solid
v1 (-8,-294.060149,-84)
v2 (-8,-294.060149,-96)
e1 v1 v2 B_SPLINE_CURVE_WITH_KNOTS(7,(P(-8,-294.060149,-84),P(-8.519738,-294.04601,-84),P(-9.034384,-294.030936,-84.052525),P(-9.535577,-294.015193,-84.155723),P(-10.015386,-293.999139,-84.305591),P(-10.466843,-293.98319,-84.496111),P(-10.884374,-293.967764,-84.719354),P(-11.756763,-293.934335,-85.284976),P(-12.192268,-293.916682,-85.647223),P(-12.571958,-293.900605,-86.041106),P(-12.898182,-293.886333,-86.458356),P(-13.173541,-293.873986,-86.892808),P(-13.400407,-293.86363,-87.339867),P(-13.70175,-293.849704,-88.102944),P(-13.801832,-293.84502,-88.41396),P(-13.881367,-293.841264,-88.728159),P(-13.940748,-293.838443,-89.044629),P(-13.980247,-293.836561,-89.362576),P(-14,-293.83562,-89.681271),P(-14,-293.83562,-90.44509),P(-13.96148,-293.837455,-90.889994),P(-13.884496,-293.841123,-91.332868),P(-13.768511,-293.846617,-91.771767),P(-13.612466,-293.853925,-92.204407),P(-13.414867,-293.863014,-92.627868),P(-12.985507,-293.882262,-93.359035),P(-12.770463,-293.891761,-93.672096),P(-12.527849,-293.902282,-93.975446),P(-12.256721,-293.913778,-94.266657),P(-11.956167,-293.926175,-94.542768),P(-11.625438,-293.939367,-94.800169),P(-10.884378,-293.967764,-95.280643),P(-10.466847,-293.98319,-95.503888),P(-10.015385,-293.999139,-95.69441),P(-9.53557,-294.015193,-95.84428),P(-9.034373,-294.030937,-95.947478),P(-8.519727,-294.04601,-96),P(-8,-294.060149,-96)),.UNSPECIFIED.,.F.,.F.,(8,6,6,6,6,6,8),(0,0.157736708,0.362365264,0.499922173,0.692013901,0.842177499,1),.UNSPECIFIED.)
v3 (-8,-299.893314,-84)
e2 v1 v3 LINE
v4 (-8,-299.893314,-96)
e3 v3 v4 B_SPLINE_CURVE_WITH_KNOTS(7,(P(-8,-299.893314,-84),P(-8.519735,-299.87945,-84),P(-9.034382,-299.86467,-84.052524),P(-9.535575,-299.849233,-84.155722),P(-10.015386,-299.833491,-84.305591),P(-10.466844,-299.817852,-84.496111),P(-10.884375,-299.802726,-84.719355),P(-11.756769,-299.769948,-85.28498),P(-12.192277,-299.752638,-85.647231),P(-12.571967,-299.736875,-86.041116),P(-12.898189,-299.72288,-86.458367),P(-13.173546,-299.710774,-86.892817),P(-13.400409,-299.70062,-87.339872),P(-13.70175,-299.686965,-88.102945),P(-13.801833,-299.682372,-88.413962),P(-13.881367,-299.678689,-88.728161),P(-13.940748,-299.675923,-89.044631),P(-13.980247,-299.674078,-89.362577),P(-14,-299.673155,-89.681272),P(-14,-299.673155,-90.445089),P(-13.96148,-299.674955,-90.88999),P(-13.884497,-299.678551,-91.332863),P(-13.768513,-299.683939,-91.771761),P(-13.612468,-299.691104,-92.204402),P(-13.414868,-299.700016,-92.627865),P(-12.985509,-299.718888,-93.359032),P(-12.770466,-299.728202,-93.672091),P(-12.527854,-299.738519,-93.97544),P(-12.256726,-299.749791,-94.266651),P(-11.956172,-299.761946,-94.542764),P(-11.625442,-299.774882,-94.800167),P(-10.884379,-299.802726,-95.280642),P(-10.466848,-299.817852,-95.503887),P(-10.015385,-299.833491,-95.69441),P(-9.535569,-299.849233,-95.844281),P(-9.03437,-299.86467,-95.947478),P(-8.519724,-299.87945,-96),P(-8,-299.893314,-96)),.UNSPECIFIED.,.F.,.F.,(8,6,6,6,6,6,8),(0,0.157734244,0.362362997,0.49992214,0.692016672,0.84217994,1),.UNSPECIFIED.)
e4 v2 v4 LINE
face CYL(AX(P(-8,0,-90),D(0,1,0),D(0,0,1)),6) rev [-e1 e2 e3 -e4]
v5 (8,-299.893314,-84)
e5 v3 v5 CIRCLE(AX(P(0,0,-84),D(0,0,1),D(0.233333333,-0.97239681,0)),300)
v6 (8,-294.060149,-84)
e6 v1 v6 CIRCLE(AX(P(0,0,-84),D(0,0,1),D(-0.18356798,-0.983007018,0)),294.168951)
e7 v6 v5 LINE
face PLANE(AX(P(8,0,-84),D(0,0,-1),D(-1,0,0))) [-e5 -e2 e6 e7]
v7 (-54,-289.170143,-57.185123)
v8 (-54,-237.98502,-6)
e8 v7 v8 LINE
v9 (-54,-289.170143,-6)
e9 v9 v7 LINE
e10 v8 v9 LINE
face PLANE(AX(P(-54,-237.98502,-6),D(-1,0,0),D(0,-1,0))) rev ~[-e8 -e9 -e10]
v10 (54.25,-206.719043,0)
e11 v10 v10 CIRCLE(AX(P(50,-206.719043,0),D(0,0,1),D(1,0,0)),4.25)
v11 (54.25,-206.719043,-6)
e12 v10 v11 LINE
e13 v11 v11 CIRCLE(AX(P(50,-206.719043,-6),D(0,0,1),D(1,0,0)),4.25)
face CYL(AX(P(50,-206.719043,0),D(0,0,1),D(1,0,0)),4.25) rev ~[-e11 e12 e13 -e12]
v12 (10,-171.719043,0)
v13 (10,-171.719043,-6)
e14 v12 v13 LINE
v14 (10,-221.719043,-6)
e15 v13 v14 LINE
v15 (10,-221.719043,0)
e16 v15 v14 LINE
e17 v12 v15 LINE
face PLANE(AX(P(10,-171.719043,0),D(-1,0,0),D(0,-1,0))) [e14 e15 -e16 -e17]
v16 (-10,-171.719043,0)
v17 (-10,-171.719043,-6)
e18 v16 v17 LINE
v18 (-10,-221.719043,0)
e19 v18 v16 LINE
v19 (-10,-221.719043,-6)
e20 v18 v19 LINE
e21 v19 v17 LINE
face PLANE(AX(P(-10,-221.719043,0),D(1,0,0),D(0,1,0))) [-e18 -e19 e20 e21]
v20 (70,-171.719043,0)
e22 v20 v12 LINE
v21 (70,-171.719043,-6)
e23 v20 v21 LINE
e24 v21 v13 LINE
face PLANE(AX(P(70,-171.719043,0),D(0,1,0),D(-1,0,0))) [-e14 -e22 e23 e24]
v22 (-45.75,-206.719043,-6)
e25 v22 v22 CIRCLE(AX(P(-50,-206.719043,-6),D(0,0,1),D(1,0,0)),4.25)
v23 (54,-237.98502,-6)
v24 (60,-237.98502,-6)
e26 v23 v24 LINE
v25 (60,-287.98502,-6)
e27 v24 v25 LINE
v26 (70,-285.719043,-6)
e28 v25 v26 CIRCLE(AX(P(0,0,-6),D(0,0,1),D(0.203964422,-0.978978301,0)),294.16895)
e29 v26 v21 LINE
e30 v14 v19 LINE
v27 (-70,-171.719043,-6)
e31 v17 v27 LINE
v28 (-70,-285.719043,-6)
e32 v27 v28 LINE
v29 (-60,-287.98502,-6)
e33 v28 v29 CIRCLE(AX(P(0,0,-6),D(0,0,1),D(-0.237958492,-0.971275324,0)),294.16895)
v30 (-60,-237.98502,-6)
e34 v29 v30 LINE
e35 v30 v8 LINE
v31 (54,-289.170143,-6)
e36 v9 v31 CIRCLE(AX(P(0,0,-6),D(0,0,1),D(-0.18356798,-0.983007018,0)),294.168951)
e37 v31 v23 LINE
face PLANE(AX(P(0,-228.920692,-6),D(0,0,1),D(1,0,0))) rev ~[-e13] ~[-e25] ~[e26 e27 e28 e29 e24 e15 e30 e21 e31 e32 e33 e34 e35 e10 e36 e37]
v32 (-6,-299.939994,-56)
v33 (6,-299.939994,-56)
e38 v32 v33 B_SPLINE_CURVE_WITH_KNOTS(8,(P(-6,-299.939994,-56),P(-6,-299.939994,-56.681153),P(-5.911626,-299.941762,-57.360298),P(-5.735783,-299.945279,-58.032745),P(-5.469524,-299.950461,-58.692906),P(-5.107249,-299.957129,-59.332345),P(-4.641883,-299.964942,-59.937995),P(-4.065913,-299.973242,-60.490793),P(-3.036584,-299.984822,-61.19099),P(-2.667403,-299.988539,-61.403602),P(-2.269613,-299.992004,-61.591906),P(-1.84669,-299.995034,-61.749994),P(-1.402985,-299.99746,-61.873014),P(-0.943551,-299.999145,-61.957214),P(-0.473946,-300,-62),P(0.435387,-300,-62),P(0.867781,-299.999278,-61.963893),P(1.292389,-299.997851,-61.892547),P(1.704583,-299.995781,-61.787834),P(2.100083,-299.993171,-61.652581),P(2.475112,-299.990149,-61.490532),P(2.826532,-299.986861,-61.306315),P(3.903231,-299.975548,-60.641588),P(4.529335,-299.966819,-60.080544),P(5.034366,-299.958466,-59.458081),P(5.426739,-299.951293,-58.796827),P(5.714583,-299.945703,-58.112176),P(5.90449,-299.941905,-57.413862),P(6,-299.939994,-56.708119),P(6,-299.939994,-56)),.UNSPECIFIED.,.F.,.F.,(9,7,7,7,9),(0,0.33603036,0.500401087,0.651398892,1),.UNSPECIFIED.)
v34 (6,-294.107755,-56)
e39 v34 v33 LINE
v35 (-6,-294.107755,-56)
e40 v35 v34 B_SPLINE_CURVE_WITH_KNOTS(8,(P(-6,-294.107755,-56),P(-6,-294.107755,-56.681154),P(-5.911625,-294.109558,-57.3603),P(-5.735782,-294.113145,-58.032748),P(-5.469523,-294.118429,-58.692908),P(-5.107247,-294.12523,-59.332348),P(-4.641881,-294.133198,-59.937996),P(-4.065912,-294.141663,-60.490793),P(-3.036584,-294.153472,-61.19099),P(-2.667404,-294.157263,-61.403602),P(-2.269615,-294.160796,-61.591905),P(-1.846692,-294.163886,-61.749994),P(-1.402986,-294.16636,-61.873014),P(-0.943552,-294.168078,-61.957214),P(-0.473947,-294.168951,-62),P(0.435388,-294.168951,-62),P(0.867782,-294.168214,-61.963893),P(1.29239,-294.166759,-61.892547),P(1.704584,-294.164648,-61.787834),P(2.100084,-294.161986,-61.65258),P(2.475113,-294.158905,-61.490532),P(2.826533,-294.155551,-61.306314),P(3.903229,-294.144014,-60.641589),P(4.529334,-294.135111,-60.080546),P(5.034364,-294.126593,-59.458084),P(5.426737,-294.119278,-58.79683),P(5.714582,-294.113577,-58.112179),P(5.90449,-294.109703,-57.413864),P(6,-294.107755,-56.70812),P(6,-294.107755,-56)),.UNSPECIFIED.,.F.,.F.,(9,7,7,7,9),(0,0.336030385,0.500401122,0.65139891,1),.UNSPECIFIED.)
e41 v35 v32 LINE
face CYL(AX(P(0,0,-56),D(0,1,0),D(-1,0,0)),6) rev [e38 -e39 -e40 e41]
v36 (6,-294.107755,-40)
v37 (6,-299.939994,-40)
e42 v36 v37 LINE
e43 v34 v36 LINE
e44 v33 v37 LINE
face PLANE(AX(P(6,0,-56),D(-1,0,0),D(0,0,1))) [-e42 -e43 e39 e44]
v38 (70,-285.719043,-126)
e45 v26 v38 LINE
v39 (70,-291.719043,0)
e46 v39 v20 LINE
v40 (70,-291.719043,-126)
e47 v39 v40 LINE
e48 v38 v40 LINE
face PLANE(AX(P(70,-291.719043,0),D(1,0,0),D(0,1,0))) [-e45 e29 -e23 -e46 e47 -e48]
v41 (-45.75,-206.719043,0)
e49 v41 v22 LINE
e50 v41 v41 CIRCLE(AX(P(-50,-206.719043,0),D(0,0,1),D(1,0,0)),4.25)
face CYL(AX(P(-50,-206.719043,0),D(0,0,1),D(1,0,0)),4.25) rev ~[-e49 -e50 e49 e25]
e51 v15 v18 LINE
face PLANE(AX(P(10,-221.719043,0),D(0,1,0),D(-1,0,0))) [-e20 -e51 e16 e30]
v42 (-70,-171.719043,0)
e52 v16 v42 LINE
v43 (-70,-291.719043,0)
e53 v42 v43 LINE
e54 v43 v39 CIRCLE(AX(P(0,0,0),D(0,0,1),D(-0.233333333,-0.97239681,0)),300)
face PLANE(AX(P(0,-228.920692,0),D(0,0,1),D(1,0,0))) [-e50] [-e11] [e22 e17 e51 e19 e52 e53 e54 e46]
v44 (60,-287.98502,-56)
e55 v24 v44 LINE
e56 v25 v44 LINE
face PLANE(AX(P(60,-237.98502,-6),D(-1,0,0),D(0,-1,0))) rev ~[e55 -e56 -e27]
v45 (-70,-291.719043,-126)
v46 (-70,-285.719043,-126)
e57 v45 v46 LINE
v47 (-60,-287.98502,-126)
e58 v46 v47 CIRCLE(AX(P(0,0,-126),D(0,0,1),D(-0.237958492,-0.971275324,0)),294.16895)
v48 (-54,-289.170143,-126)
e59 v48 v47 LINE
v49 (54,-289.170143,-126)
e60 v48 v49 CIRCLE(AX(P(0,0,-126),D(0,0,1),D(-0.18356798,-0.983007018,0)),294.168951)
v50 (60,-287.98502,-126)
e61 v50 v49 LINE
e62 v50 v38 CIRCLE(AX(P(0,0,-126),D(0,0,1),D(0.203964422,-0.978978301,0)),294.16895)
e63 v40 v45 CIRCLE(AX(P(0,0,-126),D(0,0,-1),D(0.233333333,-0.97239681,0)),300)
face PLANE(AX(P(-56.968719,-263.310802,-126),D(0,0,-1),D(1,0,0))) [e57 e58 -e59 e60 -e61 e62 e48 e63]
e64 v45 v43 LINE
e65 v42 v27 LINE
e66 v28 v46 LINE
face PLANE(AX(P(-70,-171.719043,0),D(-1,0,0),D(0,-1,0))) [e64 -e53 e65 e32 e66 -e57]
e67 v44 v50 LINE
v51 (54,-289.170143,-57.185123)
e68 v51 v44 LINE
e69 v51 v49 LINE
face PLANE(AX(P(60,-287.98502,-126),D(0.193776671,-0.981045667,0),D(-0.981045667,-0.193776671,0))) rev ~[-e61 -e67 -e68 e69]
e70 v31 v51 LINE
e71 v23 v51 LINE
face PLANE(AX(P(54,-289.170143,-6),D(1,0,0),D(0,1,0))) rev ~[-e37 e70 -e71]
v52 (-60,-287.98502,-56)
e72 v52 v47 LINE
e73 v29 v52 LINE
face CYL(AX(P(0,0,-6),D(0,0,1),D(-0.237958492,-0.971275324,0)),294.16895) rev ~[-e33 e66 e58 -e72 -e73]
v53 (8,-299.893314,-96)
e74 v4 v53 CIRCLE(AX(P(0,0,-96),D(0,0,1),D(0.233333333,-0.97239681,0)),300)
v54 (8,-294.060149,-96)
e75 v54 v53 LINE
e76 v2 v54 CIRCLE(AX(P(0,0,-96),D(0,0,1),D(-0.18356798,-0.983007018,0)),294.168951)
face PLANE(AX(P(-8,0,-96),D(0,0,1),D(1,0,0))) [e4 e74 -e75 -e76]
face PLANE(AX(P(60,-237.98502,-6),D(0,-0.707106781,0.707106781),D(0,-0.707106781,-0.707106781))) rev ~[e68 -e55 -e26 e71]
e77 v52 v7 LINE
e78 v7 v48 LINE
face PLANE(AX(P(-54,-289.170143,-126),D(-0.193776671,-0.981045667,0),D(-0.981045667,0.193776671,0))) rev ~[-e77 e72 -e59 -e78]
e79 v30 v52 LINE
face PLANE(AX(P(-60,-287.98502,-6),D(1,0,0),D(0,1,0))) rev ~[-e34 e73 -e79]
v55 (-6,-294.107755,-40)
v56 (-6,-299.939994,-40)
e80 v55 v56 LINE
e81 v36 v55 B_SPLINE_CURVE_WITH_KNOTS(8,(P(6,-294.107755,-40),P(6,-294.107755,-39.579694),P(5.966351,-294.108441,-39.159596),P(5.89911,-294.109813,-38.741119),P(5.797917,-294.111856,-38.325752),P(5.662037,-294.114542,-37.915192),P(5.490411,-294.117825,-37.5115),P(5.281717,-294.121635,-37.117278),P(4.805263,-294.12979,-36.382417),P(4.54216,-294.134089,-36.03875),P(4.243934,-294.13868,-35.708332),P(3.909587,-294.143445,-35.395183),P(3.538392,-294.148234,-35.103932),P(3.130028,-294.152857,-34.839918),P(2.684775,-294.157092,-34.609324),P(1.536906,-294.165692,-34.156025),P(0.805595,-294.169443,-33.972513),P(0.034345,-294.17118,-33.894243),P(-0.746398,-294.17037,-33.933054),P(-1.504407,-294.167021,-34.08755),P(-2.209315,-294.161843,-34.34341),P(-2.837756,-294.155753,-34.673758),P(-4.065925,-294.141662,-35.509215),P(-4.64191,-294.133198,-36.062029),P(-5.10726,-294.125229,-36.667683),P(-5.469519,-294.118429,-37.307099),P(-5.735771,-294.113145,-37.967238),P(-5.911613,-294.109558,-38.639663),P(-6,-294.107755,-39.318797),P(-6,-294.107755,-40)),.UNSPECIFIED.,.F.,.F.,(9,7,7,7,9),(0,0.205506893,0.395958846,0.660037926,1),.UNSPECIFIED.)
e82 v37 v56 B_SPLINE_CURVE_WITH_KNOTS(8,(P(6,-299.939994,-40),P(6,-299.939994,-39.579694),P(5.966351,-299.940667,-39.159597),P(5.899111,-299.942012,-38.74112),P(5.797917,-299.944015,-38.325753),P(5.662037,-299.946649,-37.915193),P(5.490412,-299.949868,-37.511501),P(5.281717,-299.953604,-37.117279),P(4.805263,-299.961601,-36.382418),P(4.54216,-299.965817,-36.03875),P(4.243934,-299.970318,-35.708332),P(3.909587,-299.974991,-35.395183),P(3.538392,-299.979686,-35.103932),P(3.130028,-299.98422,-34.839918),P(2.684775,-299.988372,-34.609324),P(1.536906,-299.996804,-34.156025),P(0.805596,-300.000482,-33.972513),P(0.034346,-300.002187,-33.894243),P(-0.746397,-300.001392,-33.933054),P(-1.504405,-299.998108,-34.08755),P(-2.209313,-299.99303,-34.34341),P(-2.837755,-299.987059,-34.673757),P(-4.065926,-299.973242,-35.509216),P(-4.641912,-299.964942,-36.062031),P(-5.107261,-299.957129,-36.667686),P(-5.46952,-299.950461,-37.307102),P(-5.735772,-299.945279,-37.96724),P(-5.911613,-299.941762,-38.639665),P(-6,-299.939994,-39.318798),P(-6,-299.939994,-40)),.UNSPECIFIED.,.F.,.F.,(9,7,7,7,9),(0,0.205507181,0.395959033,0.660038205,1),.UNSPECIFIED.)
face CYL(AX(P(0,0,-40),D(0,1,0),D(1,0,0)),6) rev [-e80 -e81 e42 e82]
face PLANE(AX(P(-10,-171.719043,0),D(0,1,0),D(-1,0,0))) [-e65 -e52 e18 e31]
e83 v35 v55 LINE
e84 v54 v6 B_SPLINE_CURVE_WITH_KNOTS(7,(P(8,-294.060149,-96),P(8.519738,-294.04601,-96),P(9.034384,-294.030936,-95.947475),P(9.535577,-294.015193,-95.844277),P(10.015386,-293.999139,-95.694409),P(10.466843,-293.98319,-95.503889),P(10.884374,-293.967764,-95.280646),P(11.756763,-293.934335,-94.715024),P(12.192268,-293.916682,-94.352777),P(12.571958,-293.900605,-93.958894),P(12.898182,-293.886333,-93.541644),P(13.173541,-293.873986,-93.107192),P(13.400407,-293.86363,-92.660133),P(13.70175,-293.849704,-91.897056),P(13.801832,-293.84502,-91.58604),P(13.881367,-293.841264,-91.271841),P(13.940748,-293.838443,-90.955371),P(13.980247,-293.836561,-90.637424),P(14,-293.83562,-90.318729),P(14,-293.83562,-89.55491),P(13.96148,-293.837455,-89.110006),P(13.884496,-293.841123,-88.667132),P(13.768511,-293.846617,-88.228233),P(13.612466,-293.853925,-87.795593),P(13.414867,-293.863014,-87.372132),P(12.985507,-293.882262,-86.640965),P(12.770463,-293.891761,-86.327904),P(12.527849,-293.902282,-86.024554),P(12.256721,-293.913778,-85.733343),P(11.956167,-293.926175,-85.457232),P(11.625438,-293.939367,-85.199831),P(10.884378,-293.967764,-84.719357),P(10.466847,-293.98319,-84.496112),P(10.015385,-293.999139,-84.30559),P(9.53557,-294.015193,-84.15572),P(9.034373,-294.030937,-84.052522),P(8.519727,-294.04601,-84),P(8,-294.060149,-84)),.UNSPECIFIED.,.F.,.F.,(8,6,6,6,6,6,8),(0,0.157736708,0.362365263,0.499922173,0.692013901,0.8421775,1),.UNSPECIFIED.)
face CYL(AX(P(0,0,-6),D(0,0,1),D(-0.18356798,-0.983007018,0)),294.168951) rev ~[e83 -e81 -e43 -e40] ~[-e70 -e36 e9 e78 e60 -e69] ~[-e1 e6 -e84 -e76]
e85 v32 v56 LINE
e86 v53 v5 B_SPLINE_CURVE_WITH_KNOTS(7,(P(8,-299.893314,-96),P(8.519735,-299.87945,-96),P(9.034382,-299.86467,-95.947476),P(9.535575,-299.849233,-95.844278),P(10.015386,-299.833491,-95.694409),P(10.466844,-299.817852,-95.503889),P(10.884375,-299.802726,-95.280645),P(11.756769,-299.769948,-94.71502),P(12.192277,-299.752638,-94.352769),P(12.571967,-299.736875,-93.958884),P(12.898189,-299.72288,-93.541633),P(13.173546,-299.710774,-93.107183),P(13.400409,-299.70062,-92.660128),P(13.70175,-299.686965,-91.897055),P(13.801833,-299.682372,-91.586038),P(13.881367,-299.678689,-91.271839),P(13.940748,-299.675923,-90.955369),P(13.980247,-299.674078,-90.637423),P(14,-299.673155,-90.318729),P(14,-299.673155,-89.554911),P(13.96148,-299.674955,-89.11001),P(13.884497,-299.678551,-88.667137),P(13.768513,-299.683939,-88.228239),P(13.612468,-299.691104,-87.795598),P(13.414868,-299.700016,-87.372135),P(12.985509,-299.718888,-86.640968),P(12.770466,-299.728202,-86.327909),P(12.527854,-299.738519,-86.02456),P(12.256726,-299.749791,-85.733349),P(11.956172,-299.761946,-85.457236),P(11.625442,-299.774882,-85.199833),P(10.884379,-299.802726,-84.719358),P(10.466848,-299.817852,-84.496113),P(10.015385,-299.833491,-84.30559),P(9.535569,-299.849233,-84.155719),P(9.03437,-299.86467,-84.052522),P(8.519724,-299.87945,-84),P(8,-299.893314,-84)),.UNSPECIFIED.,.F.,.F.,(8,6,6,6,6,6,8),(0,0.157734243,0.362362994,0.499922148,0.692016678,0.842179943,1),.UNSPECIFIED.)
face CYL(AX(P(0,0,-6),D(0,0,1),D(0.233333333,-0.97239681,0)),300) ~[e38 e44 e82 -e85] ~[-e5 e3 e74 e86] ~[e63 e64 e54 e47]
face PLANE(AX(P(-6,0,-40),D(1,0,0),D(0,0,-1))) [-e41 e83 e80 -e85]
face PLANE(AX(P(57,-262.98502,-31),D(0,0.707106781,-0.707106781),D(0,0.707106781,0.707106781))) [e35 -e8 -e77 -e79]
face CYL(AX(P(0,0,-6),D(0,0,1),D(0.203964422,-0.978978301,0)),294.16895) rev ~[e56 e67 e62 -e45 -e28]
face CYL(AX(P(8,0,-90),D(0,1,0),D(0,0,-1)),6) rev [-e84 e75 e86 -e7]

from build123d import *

# Parameters (mm, degrees)
F0_R     = 4.25
F1_DEPTH = 6
F3_DEPTH = 120
F5_DEPTH = 120
F7_REACH = 132.1169232427
F9_DEPTH = 300.001


with BuildPart() as f1:
    # F0 (on Top) → F1 (new body)
    with BuildSketch(Plane.XY):
        with BuildLine():
            Line((-70, -171.7190429163), (-70, -291.7190429163))
            ThreePointArc((-70, -291.7190429163), (0, -300), (70, -291.7190429163))
            Line((70, -291.7190429163), (70, -171.7190429163))
            Line((70, -171.7190429163), (10, -171.7190429163))
            Line((10, -171.7190429163), (10, -221.7190429163))
            Line((10, -221.7190429163), (0, -221.7190429163))
            Line((0, -221.7190429163), (-10, -221.7190429163))
            Line((-10, -221.7190429163), (-10, -171.7190429163))
            Line((-10, -171.7190429163), (-70, -171.7190429163))
        make_face()
        with Locations((-50, -206.7190429163)):
            Circle(F0_R, mode=Mode.SUBTRACT)
        with Locations((50, -206.7190429163)):
            Circle(F0_R, mode=Mode.SUBTRACT)
    extrude(amount=-F1_DEPTH)

    # F2 (on face) → F3 (join)
    with BuildSketch(Plane(origin=(0, 0, -6), x_dir=(1, 0, 0), z_dir=(0, 0, -1))):
        with BuildLine():
            Line((-54, 237.9850195496), (-54, 289.1701427966))
            ThreePointArc((-54, 289.1701427966), (-57.0030799982, 288.5931744788), (-60, 287.9850195496))
            Line((-60, 287.9850195496), (-60, 237.9850195496))
            Line((-60, 237.9850195496), (-54, 237.9850195496))
        make_face()
        with BuildLine():
            ThreePointArc((60, 287.9850195496), (65.0098735772, 286.8956043973), (70, 285.7190429163))
            Line((70, 285.7190429163), (70, 291.7190429163))
            ThreePointArc((70, 291.7190429163), (0, 300), (-70, 291.7190429163))
            Line((-70, 291.7190429163), (-70, 285.7190429163))
            ThreePointArc((-70, 285.7190429163), (-65.0098735772, 286.8956043973), (-60, 287.9850195496))
            ThreePointArc((-60, 287.9850195496), (-57.0030799982, 288.5931744788), (-54, 289.1701427966))
            ThreePointArc((-54, 289.1701427966), (0, 294.1689505794), (54, 289.1701427966))
            ThreePointArc((54, 289.1701427966), (57.0030799982, 288.5931744788), (60, 287.9850195496))
        make_face()
        with BuildLine():
            Line((60, 237.9850195496), (60, 287.9850195496))
            ThreePointArc((60, 287.9850195496), (57.0030799982, 288.5931744788), (54, 289.1701427966))
            Line((54, 289.1701427966), (54, 237.9850195496))
            Line((54, 237.9850195496), (60, 237.9850195496))
        make_face()
    extrude(amount=F3_DEPTH)

    # F4 (on face) → F5 (cut, through all)
    with BuildSketch(Plane.YZ.offset(60)):
        Polygon((-237.9850195496, -126), (-237.9850195496, -6), (-287.9850195496, -56), (-287.9850195496, -126), align=None)
    extrude(amount=-F5_DEPTH, mode=Mode.SUBTRACT)

    f7_end = Plane(origin=(57, -262.9850195496, -31), x_dir=(0, 0.7071067812, 0.7071067812), z_dir=(0, 0.7071067812, -0.7071067812))
    # F6 (on face) → F7 (cut, up to a plane its end follows)
    with BuildSketch(Plane(origin=(0, 0, -126), x_dir=(1, 0, 0), z_dir=(0, 0, -1))):
        Polygon((-54, 287.9850195496), (-54, 289.1701427966), (-60, 287.9850195496), align=None)
        Polygon((60, 287.9850195496), (54, 289.1701427966), (54, 287.9850195496), align=None)
    f7_long = extrude(amount=-F7_REACH, mode=Mode.PRIVATE)
    add(split(f7_long, bisect_by=f7_end, keep=Keep.TOP, mode=Mode.PRIVATE), mode=Mode.SUBTRACT)

    # F8 (on Front) → F9 (cut, through all)
    with BuildSketch(Plane.XZ):
        with BuildLine():
            Line((8, -84), (0, -84))
            Line((0, -84), (-8, -84))
            ThreePointArc((-8, -84), (-14, -90), (-8, -96))
            Line((-8, -96), (0, -96))
            Line((0, -96), (8, -96))
            ThreePointArc((8, -96), (14, -90), (8, -84))
        make_face()
        with BuildLine():
            Line((6, -48), (6, -40))
            ThreePointArc((6, -40), (0, -34), (-6, -40))
            Line((-6, -40), (-6, -48))
            Line((-6, -48), (-6, -56))
            ThreePointArc((-6, -56), (0, -62), (6, -56))
            Line((6, -56), (6, -48))
        make_face()
    extrude(amount=F9_DEPTH, mode=Mode.SUBTRACT)


solid = f1.part
